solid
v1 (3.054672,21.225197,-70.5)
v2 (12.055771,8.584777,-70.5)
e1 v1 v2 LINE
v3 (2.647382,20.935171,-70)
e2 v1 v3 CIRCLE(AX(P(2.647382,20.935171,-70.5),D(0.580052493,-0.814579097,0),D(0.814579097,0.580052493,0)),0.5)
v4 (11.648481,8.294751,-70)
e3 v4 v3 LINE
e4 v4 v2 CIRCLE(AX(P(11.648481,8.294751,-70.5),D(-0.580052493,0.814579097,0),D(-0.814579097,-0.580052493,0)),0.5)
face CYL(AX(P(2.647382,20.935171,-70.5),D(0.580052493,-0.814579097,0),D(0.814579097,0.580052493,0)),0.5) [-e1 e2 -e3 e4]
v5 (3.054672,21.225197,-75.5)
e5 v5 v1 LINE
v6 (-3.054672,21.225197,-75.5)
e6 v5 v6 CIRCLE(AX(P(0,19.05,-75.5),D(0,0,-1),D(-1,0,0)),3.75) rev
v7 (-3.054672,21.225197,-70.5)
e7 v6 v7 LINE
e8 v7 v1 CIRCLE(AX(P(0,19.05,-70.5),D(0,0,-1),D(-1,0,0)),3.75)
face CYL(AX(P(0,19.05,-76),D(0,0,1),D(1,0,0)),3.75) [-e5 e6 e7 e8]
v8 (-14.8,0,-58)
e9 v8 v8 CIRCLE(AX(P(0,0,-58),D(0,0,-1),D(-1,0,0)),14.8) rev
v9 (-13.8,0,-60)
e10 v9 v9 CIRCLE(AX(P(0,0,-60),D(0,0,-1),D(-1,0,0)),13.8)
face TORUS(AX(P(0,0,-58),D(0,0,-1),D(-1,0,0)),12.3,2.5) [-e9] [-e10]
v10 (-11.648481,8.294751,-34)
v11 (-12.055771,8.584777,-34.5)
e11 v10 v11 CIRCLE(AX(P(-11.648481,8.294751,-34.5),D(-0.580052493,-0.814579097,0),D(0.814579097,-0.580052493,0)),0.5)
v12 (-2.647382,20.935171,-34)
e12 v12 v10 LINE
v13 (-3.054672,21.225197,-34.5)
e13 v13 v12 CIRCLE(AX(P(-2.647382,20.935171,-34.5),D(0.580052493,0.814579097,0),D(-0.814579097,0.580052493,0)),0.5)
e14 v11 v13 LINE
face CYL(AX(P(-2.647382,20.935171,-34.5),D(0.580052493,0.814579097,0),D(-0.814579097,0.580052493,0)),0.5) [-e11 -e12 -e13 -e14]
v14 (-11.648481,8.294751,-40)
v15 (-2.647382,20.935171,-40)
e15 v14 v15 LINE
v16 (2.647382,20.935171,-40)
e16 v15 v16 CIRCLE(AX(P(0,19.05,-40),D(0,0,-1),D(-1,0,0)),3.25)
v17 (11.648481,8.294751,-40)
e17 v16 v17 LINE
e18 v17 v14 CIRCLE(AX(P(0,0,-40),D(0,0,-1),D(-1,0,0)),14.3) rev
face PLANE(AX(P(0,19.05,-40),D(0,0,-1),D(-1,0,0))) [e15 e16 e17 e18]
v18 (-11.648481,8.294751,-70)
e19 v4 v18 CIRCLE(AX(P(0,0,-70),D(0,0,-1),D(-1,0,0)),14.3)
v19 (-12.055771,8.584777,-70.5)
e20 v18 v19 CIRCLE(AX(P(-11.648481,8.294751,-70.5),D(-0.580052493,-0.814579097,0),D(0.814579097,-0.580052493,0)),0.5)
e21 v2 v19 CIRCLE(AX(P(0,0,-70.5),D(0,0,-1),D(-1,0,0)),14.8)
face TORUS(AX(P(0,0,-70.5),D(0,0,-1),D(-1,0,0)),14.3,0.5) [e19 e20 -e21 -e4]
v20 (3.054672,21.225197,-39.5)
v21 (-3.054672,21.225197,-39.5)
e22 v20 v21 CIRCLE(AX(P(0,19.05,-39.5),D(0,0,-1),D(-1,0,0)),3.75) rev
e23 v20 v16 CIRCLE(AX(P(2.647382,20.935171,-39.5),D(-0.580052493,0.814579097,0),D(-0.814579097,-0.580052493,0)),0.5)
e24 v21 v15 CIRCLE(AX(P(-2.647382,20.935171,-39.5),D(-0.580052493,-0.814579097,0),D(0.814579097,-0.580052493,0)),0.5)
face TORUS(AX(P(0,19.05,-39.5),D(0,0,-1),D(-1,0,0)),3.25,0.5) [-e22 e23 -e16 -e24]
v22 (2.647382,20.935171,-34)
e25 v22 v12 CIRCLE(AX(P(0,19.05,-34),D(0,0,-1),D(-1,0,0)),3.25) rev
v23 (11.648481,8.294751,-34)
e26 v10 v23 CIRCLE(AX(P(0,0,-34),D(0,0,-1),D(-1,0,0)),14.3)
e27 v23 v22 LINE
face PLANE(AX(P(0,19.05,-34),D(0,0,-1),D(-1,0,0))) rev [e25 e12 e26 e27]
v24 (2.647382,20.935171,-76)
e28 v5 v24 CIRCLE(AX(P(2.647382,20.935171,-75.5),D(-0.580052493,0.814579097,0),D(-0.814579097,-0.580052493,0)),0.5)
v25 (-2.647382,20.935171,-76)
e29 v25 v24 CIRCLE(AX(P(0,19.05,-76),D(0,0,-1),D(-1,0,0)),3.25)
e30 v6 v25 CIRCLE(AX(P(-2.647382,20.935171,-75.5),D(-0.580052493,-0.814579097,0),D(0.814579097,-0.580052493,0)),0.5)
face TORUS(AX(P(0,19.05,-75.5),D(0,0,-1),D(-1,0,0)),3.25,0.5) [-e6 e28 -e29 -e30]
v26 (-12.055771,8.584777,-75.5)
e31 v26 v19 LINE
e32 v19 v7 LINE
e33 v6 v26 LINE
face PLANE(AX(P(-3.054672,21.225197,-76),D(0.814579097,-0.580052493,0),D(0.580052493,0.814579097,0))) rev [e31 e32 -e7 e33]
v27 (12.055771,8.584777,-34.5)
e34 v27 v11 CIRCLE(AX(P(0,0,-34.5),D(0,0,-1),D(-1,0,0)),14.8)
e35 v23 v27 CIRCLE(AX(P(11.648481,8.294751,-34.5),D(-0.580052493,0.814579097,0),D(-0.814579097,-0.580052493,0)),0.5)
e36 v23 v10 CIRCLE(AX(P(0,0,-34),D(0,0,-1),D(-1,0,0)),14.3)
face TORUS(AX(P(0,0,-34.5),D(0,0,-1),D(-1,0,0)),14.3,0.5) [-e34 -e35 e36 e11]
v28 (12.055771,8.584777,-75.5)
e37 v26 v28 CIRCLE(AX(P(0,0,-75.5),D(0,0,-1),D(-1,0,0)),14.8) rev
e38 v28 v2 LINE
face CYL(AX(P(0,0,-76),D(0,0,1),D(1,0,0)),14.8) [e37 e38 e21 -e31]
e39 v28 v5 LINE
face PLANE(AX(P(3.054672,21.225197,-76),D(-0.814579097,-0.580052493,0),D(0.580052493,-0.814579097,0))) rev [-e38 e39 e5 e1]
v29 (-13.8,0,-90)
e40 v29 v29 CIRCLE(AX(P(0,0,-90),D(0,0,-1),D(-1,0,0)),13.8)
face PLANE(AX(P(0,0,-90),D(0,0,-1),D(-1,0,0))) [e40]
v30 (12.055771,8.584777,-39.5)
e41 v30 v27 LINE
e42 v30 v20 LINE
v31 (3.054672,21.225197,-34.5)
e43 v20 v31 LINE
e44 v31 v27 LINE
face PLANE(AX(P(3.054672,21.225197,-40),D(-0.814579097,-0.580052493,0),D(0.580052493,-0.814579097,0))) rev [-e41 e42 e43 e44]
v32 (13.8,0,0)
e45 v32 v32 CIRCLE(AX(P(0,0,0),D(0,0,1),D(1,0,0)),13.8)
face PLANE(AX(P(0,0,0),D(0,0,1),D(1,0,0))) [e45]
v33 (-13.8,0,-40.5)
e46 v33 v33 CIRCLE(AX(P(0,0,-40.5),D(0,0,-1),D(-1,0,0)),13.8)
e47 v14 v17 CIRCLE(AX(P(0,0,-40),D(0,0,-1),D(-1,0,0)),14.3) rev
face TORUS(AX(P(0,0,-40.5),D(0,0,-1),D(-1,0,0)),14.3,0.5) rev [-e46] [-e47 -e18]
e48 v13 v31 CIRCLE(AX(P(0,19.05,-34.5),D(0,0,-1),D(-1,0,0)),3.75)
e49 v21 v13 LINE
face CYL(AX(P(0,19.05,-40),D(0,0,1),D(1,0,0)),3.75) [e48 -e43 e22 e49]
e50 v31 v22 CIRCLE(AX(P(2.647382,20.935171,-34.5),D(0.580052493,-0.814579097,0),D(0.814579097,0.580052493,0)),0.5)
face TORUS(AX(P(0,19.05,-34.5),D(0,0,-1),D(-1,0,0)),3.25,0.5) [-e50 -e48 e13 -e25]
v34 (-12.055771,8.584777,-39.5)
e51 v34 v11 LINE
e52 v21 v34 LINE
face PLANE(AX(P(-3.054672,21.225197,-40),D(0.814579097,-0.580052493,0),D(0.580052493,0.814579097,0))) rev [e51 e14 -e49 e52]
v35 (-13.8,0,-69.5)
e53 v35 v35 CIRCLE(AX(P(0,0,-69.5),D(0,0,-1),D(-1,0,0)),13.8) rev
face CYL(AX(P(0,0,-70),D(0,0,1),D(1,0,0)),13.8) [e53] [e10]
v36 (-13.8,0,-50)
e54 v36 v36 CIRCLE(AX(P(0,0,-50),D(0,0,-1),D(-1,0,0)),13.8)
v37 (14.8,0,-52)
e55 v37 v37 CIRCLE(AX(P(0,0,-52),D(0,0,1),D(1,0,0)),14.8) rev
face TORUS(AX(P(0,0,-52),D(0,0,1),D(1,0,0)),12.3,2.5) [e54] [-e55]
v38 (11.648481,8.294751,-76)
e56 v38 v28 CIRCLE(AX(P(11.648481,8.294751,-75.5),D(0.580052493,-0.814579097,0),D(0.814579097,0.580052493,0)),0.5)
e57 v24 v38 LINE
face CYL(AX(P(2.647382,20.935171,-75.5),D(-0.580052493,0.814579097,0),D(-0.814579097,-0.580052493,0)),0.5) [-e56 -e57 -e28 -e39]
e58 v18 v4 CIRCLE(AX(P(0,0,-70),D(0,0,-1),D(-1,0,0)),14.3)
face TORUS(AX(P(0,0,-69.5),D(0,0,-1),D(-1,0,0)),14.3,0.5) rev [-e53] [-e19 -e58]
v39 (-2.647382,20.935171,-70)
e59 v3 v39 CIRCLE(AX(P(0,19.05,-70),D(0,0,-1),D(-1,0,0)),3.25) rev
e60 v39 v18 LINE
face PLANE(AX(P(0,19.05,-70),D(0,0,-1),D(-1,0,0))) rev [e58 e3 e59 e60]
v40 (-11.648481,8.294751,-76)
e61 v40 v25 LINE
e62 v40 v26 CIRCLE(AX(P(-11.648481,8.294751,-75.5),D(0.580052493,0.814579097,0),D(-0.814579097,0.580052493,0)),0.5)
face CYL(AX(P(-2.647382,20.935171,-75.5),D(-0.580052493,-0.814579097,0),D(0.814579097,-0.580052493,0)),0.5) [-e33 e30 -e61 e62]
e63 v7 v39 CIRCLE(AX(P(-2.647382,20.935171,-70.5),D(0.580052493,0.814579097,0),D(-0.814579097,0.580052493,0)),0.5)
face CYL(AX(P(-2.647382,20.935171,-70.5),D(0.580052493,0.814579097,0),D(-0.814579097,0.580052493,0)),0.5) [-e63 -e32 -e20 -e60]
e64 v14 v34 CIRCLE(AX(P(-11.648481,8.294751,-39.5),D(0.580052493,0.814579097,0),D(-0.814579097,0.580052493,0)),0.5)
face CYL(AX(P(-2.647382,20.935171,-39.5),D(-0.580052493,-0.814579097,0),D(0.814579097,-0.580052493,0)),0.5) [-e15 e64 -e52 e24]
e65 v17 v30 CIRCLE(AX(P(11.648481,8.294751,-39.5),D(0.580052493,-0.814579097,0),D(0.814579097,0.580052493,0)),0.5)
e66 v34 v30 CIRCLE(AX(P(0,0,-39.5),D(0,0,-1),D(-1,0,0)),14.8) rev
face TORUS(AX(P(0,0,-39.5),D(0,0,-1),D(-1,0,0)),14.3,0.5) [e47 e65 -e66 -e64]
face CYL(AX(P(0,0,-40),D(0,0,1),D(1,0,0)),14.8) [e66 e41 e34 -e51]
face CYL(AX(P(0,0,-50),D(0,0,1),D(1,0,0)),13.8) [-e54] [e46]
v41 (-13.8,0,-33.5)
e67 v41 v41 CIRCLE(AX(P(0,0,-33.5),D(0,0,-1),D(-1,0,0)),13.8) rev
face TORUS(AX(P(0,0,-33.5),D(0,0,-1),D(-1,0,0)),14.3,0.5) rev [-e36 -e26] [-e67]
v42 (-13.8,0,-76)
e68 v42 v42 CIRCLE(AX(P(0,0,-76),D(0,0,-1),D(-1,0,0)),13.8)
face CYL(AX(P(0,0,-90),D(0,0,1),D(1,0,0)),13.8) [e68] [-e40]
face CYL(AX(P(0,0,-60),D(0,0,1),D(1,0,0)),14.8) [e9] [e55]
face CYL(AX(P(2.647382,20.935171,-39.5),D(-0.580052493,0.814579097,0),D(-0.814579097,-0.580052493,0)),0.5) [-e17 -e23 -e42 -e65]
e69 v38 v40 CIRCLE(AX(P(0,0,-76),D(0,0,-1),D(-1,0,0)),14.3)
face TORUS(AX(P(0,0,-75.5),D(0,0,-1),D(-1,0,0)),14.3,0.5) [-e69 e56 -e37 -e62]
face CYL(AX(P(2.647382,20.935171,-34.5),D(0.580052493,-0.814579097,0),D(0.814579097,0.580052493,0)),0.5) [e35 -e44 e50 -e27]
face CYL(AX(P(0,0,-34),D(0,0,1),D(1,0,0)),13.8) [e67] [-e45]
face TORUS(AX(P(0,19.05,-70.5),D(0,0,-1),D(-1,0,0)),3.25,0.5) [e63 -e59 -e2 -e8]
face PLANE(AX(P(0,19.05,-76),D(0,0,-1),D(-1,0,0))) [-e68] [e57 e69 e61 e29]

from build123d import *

# Parameters (mm, degrees)
SKETCH1_R           = 13.8
BOSS_EXTRUDE1_DEPTH = 34
BOSS_EXTRUDE2_DEPTH = 6
SKETCH4_R           = 13.8
BOSS_EXTRUDE3_DEPTH = 10
SKETCH5_R           = 14.8
BOSS_EXTRUDE4_DEPTH = 10
SKETCH6_R           = 13.8
BOSS_EXTRUDE5_DEPTH = 10
FILLET1_R           = 2.5
BOSS_EXTRUDE6_DEPTH = 6
FILLET2_R           = 0.5
SKETCH8_R           = 13.8
BOSS_EXTRUDE8_DEPTH = 14


# Some blends are built 0.0001 mm under size
with BuildPart() as part:
    # Sketch1 → Boss-Extrude1 (new body)
    with BuildSketch(Plane.XY):
        Circle(SKETCH1_R)
    extrude(amount=-BOSS_EXTRUDE1_DEPTH)

    # Sketch3 → Boss-Extrude2 (add)
    with BuildSketch(Plane(origin=(0, 0, -34), x_dir=(-1, 0, 0), z_dir=(0, 0, -1))):
        with BuildLine():
            Line((-3.054671613, 21.22519685), (-12.055770632, 8.584776903))
            ThreePointArc((-12.055770632, 8.584776903), (0, -14.8), (12.055770632, 8.584776903))
            Line((12.055770632, 8.584776903), (3.054671613, 21.22519685))
            ThreePointArc((3.054671613, 21.22519685), (0, 22.8), (-3.054671613, 21.22519685))
        make_face()
    extrude(amount=BOSS_EXTRUDE2_DEPTH)

    # Sketch4 → Boss-Extrude3 (add)
    with BuildSketch(Plane(origin=(0, 0, -40), x_dir=(-1, 0, 0), z_dir=(0, 0, -1))):
        with Locations(Location((0, 0, 0), (0, 0, 180))):
            Circle(SKETCH4_R)
    extrude(amount=BOSS_EXTRUDE3_DEPTH)

    # Sketch5 → Boss-Extrude4 (add)
    with BuildSketch(Plane(origin=(0, 0, -50), x_dir=(-1, 0, 0), z_dir=(0, 0, -1))):
        Circle(SKETCH5_R)
    extrude(amount=BOSS_EXTRUDE4_DEPTH)

    # Sketch6 → Boss-Extrude5 (add)
    with BuildSketch(Plane(origin=(0, 0, -60), x_dir=(-1, 0, 0), z_dir=(0, 0, -1))):
        with Locations(Location((0, 0, 0), (0, 0, 180))):
            Circle(SKETCH6_R)
    extrude(amount=BOSS_EXTRUDE5_DEPTH)

    # Fillet1
    # the kernel refuses this fillet: 2.5 mm, written as the material it takes off along each edge
    with BuildSketch(Plane(origin=(0, 0, -50), x_dir=(-1, 0, 0), z_dir=(0, -1, 0))) as fillet1_piece_1:
        with BuildLine():
            CenterArc((12.3, 2), FILLET1_R, 306.869897646, 53.130102354)
            Line((13.8, 0), (13.83, -0.04))
            ThreePointArc((13.83, -0.04), (14.3, -0.05), (14.8, -0.05))
            Line((14.8, -0.05), (14.85, 0))
            Line((14.85, 0), (14.85, 2))
            Line((14.85, 2), (14.8, 2))
        make_face()
    revolve(axis=Axis((0, 0, -50), (0, 0, -1)), mode=Mode.SUBTRACT)
    with BuildSketch(Plane(origin=(0, 0, -60), x_dir=(-1, 0, 0), z_dir=(0, -1, 0))) as fillet1_piece_2:
        with BuildLine():
            CenterArc((12.3, -2), FILLET1_R, 0, 53.130102354)
            Line((13.8, 0), (13.83, 0.04))
            ThreePointArc((13.83, 0.04), (14.3, 0.05), (14.8, 0.05))
            Line((14.8, 0.05), (14.85, 0))
            Line((14.85, 0), (14.85, -2))
            Line((14.85, -2), (14.8, -2))
        make_face()
    revolve(axis=Axis((0, 0, -60), (0, 0, -1)), mode=Mode.SUBTRACT)

    # Sketch7 → Boss-Extrude6 (add)
    with BuildSketch(Plane(origin=(0, 0, -70), x_dir=(-1, 0, 0), z_dir=(0, 0, -1))):
        with BuildLine():
            Line((-3.054671613, 21.22519685), (-12.055770632, 8.584776903))
            ThreePointArc((-12.055770632, 8.584776903), (0, -14.8), (12.055770632, 8.584776903))
            Line((12.055770632, 8.584776903), (3.054671613, 21.22519685))
            ThreePointArc((3.054671613, 21.22519685), (0, 22.8), (-3.054671613, 21.22519685))
        make_face()
    extrude(amount=BOSS_EXTRUDE6_DEPTH)

    # Fillet2
    fillet2_edges = [part.edges().sort_by_distance(p)[0] for p in [
        (-13.8, 0, -40),
        (-13.8, 0, -70),
        (0, 22.8, -70),
        (7.555221122, 14.904986877, -70),
        (0, -14.8, -70),
        (-7.555221122, 14.904986877, -70),
        (0, 22.8, -76),
        (7.555221122, 14.904986877, -76),
        (0, -14.8, -76),
        (-7.555221122, 14.904986877, -76),
        (-13.8, 0, -34),
        (0, 22.8, -34),
        (7.555221122, 14.904986877, -34),
        (0, -14.8, -34),
        (-7.555221122, 14.904986877, -34),
        (0, 22.8, -40),
        (7.555221122, 14.904986877, -40),
        (0, -14.8, -40),
        (-7.555221122, 14.904986877, -40),
    ]]
    fillet(fillet2_edges, radius=FILLET2_R - 0.0001)  # a hair under: the kernel refuses the full size

    # Sketch8 → Boss-Extrude8 (add)
    with BuildSketch(Plane(origin=(0, 0, -76), x_dir=(-1, 0, 0), z_dir=(0, 0, -1))):
        with Locations(Location((0, 0, 0), (0, 0, 180))):
            Circle(SKETCH8_R)
    extrude(amount=BOSS_EXTRUDE8_DEPTH)


solid = part.part
